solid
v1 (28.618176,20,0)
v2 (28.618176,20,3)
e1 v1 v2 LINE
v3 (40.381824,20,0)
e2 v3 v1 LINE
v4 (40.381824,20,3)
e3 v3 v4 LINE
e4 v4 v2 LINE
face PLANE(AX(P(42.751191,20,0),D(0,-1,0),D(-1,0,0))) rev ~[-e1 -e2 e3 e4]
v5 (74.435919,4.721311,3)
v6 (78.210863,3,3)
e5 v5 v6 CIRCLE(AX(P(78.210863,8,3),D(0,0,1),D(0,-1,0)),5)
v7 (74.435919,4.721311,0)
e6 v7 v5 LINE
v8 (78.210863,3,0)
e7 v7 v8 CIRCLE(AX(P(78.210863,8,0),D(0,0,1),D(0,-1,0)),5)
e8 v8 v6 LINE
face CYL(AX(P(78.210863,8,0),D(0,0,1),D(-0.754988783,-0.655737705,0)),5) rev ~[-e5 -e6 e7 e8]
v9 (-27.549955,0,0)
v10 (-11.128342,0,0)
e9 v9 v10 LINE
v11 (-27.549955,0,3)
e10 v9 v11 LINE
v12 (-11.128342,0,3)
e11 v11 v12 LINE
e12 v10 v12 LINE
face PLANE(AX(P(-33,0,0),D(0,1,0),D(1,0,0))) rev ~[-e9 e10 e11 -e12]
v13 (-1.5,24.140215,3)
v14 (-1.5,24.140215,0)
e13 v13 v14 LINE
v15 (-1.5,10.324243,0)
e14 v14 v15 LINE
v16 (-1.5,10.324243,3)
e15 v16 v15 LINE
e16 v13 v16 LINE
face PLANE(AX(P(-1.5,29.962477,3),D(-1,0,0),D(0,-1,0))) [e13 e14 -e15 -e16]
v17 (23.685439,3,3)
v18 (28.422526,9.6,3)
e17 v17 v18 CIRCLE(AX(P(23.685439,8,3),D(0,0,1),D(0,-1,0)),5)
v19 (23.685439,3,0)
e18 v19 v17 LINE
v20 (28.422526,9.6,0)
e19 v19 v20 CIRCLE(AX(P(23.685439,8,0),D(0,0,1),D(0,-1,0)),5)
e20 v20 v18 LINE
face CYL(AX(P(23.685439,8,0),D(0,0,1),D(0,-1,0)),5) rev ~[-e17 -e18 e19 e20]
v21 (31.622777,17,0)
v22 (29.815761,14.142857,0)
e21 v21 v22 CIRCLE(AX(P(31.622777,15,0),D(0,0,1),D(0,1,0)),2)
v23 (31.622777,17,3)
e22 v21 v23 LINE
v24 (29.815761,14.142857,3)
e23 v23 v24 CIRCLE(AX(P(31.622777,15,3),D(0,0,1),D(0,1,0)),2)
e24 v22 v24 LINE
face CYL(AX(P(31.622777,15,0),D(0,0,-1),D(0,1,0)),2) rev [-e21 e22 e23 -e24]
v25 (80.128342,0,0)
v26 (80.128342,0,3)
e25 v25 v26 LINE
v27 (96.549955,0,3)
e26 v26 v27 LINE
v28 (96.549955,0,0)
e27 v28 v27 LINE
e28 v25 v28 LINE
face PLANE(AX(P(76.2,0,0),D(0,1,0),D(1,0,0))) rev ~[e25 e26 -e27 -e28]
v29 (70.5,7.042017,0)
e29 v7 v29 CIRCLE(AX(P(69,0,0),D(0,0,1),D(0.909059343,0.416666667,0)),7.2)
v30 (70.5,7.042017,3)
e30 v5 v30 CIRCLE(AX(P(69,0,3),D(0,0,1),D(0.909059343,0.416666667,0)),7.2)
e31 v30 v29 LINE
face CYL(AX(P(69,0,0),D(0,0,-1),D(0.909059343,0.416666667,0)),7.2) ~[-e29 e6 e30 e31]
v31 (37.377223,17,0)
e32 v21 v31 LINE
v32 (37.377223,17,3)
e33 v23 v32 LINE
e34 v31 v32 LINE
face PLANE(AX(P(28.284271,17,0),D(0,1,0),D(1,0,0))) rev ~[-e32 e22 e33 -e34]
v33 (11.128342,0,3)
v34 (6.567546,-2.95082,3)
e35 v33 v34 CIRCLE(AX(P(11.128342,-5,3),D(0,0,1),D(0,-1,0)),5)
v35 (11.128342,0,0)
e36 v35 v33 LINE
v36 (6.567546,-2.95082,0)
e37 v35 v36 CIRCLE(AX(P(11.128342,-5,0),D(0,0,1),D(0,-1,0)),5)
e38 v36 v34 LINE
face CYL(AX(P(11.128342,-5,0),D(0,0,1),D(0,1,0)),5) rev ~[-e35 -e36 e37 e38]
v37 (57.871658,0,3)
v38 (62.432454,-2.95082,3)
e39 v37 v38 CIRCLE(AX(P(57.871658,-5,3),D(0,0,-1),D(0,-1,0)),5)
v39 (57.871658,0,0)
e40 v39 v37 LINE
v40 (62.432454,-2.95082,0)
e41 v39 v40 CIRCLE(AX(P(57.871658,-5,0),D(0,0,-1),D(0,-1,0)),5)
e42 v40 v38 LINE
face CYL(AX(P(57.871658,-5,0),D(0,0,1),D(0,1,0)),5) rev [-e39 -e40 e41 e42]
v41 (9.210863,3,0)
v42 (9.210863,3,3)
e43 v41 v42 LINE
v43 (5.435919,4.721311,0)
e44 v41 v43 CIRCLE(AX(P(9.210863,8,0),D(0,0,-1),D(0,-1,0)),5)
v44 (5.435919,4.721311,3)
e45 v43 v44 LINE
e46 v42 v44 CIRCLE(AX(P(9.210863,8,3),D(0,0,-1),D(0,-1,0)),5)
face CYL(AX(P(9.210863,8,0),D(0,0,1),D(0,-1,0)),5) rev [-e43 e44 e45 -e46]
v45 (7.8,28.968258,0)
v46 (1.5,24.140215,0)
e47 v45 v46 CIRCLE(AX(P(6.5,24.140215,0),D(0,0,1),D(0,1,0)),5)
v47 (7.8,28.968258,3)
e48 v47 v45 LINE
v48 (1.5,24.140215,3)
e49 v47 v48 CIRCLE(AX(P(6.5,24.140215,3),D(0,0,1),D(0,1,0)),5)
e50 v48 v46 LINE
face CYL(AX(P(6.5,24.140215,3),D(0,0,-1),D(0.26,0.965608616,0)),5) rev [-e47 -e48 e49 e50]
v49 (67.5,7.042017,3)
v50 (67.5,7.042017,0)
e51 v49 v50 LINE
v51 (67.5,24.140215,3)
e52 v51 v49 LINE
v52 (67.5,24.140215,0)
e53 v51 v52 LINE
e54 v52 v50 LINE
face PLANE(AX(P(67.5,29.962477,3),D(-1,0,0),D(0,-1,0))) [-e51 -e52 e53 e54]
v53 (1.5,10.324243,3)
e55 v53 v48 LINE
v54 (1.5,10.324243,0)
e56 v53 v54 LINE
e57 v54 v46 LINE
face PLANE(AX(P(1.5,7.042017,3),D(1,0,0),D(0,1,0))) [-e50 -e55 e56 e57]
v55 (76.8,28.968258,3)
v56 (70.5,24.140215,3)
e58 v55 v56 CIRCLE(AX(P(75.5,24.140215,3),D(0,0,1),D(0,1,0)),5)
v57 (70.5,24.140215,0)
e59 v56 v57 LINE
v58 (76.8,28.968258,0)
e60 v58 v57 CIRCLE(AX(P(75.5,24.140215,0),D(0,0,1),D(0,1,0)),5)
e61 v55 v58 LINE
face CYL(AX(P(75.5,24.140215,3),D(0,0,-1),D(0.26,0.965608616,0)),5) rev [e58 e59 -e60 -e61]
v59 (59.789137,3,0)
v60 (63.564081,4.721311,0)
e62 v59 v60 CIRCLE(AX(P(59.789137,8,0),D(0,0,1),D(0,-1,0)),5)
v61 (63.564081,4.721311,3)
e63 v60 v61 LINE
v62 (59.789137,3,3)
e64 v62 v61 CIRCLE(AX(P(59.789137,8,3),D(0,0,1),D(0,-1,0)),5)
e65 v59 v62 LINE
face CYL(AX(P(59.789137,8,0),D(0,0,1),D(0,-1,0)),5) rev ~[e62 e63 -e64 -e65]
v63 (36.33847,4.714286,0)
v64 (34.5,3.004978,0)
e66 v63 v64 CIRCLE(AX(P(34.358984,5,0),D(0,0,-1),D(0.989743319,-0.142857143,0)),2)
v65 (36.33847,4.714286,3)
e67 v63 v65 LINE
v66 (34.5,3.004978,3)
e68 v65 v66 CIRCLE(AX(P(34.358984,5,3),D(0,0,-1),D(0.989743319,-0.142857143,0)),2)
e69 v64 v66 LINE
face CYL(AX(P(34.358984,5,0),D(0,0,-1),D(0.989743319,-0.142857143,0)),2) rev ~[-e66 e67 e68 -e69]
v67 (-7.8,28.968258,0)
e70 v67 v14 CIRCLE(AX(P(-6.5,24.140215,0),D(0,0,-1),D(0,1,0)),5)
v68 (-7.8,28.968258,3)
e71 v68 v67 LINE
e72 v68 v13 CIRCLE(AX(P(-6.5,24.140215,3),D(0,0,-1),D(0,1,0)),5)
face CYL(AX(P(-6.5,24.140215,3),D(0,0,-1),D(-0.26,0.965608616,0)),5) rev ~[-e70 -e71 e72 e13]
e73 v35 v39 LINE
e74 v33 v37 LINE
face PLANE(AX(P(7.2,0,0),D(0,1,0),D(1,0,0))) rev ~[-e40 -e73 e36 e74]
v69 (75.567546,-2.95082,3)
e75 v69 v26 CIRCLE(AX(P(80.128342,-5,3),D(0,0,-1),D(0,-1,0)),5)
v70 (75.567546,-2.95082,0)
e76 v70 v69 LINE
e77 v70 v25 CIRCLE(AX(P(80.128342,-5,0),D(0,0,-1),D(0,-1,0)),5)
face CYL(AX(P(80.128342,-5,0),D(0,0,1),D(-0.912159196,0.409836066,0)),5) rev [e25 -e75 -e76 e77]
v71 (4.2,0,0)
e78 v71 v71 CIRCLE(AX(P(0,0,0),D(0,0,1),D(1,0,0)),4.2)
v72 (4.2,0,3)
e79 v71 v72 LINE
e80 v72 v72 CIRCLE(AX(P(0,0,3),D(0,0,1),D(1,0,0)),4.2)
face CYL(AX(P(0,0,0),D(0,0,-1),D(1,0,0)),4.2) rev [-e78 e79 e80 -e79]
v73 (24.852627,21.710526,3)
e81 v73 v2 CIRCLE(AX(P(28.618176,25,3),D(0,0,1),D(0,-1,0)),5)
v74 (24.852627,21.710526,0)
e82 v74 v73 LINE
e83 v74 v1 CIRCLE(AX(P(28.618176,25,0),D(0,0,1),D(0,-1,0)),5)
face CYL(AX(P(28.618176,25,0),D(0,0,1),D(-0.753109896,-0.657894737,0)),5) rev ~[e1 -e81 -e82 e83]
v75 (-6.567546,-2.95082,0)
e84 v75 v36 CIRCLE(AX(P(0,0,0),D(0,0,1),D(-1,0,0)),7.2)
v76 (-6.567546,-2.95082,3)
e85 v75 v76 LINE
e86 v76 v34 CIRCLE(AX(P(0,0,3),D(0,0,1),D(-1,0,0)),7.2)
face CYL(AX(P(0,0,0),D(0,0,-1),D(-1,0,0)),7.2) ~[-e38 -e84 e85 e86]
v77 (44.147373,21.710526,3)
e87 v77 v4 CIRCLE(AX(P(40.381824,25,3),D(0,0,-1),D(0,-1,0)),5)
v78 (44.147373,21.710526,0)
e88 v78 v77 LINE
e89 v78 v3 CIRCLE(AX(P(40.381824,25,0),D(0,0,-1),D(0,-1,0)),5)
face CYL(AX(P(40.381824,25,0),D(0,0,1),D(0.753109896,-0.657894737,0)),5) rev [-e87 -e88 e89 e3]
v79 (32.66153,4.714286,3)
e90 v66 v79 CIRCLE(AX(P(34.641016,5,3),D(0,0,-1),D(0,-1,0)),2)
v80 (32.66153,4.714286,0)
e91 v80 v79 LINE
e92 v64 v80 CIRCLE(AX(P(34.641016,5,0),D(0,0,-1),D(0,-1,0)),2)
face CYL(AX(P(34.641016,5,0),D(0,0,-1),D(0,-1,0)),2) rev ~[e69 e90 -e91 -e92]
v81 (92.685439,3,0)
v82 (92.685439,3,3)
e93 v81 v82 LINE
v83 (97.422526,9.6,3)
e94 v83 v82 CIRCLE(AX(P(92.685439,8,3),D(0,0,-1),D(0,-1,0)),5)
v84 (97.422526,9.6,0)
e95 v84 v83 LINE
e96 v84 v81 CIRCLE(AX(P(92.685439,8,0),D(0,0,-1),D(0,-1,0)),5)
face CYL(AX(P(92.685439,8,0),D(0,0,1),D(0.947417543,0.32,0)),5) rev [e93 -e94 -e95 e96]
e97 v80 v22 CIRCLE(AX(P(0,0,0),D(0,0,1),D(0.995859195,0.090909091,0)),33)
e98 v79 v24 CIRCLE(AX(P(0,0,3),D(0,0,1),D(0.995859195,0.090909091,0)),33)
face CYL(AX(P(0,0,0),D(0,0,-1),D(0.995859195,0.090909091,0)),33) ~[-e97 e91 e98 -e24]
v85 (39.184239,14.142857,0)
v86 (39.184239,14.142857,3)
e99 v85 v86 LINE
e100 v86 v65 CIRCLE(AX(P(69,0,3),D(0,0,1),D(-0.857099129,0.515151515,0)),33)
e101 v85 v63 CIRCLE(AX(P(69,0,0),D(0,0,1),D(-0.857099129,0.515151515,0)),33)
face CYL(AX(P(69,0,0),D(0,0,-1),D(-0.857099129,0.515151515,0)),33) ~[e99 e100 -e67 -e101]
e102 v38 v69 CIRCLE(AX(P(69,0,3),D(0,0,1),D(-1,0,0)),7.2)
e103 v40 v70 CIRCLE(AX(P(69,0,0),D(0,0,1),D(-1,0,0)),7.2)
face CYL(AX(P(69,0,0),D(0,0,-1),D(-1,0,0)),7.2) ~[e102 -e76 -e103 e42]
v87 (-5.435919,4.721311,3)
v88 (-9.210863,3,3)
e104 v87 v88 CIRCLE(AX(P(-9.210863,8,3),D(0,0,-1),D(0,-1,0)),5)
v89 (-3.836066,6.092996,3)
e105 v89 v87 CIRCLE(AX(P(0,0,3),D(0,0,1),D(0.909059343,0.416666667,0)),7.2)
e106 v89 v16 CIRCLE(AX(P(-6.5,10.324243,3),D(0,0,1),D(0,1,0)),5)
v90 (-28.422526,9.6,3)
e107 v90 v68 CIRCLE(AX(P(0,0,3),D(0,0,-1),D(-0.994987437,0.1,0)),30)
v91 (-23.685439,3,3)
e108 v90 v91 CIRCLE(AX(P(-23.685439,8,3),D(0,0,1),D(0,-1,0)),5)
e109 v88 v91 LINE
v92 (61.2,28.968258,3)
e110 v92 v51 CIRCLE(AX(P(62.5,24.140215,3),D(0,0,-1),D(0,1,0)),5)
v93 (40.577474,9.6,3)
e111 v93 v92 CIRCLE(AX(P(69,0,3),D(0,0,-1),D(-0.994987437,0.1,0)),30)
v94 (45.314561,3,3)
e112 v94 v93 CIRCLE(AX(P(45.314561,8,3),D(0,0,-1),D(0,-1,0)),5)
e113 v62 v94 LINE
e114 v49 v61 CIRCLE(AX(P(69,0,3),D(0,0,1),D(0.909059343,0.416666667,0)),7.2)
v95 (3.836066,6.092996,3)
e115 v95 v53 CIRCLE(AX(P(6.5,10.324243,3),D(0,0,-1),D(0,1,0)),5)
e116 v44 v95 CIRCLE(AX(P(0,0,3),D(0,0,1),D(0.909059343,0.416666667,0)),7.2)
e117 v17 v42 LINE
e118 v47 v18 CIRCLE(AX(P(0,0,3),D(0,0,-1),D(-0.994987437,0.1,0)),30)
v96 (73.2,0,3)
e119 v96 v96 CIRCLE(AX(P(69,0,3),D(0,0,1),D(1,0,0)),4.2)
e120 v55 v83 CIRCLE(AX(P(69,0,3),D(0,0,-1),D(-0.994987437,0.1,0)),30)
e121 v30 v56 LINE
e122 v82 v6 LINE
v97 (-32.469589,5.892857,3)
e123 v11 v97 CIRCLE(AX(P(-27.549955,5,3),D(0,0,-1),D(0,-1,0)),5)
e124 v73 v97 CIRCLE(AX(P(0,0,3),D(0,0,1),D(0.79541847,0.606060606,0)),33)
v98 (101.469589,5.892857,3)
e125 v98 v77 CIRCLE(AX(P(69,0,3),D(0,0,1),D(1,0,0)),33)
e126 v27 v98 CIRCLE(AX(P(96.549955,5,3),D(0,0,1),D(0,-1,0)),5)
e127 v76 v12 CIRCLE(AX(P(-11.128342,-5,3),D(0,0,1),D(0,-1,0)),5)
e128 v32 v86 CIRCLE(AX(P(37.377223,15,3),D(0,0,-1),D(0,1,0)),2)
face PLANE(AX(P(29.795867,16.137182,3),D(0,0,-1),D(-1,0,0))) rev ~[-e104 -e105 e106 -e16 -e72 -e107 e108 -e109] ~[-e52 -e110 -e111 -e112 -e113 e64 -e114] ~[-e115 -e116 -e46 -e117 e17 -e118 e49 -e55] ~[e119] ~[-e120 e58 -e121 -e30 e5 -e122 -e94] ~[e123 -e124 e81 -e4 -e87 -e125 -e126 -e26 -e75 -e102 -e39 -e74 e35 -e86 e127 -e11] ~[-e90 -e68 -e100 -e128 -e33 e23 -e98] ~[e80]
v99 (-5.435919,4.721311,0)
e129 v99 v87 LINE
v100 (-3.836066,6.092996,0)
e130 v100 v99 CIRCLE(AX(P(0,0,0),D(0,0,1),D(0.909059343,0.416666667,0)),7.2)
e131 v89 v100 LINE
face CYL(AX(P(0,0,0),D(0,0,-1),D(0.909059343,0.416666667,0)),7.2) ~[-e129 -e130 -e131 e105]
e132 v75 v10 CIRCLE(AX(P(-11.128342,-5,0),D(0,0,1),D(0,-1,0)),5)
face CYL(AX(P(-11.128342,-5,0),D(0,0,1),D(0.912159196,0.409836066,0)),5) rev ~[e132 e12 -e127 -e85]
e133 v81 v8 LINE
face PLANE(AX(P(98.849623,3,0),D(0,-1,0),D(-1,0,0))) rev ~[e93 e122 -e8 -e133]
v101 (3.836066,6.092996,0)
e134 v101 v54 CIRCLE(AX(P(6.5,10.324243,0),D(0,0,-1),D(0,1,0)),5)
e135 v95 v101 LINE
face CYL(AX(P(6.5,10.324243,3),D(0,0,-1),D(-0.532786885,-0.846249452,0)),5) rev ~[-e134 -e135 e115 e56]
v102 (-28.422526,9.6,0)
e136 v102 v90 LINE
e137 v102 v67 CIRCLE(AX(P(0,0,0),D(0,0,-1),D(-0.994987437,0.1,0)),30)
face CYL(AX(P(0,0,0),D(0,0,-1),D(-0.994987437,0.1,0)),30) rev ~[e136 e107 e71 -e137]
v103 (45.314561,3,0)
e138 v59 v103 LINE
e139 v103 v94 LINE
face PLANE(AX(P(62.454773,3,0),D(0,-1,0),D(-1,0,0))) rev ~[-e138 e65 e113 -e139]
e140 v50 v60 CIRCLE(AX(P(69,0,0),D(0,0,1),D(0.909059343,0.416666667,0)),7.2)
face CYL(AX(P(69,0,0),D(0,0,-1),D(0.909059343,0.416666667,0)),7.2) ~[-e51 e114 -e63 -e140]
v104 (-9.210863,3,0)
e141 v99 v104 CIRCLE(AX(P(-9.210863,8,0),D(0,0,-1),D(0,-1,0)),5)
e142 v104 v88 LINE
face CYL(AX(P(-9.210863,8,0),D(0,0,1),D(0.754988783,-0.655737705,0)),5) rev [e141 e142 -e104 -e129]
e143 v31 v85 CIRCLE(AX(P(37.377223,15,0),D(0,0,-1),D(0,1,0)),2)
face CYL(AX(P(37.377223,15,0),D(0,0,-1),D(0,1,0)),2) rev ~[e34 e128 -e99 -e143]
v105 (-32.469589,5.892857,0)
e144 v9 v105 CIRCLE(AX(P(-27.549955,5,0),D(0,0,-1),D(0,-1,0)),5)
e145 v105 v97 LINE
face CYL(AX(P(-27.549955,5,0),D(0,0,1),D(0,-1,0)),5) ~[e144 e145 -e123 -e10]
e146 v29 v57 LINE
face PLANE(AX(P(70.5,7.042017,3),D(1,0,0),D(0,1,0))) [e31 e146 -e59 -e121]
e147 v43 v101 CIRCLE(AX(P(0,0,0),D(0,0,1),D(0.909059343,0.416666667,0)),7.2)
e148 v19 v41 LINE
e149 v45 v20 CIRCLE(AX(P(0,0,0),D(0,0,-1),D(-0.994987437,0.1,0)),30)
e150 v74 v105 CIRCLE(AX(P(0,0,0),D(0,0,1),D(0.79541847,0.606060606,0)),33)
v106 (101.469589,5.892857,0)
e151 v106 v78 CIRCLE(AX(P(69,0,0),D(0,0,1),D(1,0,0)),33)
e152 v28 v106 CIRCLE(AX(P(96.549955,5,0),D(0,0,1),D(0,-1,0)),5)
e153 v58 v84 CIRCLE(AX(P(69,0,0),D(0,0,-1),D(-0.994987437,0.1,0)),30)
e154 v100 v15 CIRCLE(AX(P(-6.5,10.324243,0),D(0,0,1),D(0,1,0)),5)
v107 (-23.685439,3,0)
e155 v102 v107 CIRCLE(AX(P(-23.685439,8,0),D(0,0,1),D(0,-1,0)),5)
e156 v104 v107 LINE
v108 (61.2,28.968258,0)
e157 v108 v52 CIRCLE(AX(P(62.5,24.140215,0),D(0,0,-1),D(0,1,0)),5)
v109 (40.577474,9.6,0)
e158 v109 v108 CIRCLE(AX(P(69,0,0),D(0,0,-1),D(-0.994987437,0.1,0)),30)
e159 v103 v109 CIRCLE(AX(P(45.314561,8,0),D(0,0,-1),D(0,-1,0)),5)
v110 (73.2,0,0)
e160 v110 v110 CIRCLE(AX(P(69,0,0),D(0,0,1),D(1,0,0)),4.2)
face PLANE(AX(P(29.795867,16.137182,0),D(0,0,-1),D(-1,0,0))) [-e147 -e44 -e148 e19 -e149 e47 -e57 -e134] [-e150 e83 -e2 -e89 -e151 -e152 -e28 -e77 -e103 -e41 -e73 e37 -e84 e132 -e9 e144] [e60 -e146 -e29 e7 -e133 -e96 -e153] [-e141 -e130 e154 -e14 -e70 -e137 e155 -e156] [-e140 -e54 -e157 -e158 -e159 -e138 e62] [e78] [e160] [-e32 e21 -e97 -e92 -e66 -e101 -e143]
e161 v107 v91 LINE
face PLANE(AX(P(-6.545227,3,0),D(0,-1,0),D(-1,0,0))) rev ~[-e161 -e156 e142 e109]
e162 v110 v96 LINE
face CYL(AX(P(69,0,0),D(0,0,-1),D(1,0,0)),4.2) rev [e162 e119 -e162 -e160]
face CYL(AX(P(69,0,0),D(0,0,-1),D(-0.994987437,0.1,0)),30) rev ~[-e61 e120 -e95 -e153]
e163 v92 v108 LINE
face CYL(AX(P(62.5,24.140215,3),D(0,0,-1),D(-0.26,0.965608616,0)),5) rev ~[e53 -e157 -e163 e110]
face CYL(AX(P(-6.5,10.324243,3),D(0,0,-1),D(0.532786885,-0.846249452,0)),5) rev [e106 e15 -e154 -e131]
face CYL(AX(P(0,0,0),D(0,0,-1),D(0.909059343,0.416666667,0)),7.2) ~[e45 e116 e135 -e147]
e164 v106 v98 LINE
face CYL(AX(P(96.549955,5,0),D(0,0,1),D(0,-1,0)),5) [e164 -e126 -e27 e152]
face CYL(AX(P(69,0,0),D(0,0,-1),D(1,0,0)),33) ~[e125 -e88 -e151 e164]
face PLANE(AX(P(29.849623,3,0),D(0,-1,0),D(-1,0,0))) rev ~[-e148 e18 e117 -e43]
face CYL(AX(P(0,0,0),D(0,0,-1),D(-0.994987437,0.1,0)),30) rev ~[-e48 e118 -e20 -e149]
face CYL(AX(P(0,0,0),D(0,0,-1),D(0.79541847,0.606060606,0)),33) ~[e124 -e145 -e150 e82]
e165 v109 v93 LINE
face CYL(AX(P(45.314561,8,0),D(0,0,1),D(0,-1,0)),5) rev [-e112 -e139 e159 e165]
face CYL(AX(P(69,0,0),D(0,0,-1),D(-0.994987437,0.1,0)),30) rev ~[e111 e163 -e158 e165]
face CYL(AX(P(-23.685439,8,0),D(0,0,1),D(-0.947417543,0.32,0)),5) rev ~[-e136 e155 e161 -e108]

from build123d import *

# Parameters (mm, degrees)
F0_R        = 4.2
F1_DEPTH    = 3
F3_DEPTH    = 3
F4_R        = 5
F5_T1_DEPTH = 3


# Not quite as in the source:
# - a fillet or chamfer that OpenCascade refuses, or shapes differently, is made with other operations: its cross-section is extruded or revolved along the edge and cut away or added


with BuildPart() as f1:
    # F0 (on Top) → F1 (new body)
    with BuildSketch(Plane.XY):
        with BuildLine():
            ThreePointArc((6.5452272688, 3), (7.0344024741, 1.5353116402), (7.2, 0))
            Line((7.2, 0), (33, 0))
            Line((33, 0), (36, 0))
            Line((36, 0), (61.8, 0))
            ThreePointArc((61.8, 0), (61.9655975259, 1.5353116402), (62.4547727312, 3))
            Line((62.4547727312, 3), (39.1503768868, 3))
            ThreePointArc((39.1503768868, 3), (69, 30), (98.8496231132, 3))
            Line((98.8496231132, 3), (75.5452272688, 3))
            ThreePointArc((75.5452272688, 3), (76.0344024741, 1.5353116402), (76.2, 0))
            Line((76.2, 0), (102, 0))
            ThreePointArc((102, 0), (79.5543660777, 31.2666812549), (42.7511905032, 20))
            Line((42.7511905032, 20), (26.2488094968, 20))
            ThreePointArc((26.2488094968, 20), (-10.5543660777, 31.2666812549), (-33, 0))
            Line((-33, 0), (-7.2, 0))
            ThreePointArc((-7.2, 0), (-7.0344024741, 1.5353116402), (-6.5452272688, 3))
            Line((-6.5452272688, 3), (-29.8496231132, 3))
            ThreePointArc((-29.8496231132, 3), (0, 30), (29.8496231132, 3))
            Line((29.8496231132, 3), (6.5452272688, 3))
        make_face()
        with BuildLine():
            Line((36.1366465497, 3), (32.8633534503, 3))
            ThreePointArc((32.8633534503, 3), (31.364916731, 10.2587522855), (28.2842712475, 17))
            Line((28.2842712475, 17), (40.7157287525, 17))
            ThreePointArc((40.7157287525, 17), (37.635083269, 10.2587522855), (36.1366465497, 3))
        make_face(mode=Mode.SUBTRACT)
        with BuildLine():
            ThreePointArc((-7.2, 0), (0, -7.2), (7.2, 0))
            ThreePointArc((7.2, 0), (7.0344024741, 1.5353116402), (6.5452272688, 3))
            ThreePointArc((6.5452272688, 3), (0, 7.2), (-6.5452272688, 3))
            ThreePointArc((-6.5452272688, 3), (-7.0344024741, 1.5353116402), (-7.2, 0))
        make_face()
        Circle(F0_R, mode=Mode.SUBTRACT)
        with BuildLine():
            ThreePointArc((62.4547727312, 3), (61.9655975259, 1.5353116402), (61.8, 0))
            ThreePointArc((61.8, 0), (69, -7.2), (76.2, 0))
            ThreePointArc((76.2, 0), (76.0344024741, 1.5353116402), (75.5452272688, 3))
            ThreePointArc((75.5452272688, 3), (69, 7.2), (62.4547727312, 3))
        make_face()
        with Locations((69, 0)):
            Circle(F0_R, mode=Mode.SUBTRACT)
    extrude(amount=F1_DEPTH)

    # F2 (on face) → F3 (join, through all)
    with BuildSketch(Plane.XY.offset(3)):
        with BuildLine():
            Line((1.5, 7.0420167566), (1.5, 29.9624765332))
            ThreePointArc((1.5, 29.9624765332), (0.7502346317, 29.9906176662), (0, 30))
            Line((0, 30), (0, 7.2))
            ThreePointArc((0, 7.2), (0.7541483119, 7.1603952631), (1.5, 7.0420167566))
        make_face()
        with BuildLine():
            Line((0, 7.2), (0, 30))
            ThreePointArc((0, 30), (-0.7502346317, 29.9906176662), (-1.5, 29.9624765332))
            Line((-1.5, 29.9624765332), (-1.5, 7.0420167566))
            ThreePointArc((-1.5, 7.0420167566), (-0.7541483119, 7.1603952631), (0, 7.2))
        make_face()
        with BuildLine():
            Line((69, 7.2), (69, 30))
            ThreePointArc((69, 30), (68.2497653683, 29.9906176662), (67.5, 29.9624765332))
            Line((67.5, 29.9624765332), (67.5, 7.0420167566))
            ThreePointArc((67.5, 7.0420167566), (68.2458516881, 7.1603952631), (69, 7.2))
        make_face()
        with BuildLine():
            Line((70.5, 7.0420167566), (70.5, 29.9624765332))
            ThreePointArc((70.5, 29.9624765332), (69.7502346317, 29.9906176662), (69, 30))
            Line((69, 30), (69, 7.2))
            ThreePointArc((69, 7.2), (69.7541483119, 7.1603952631), (70.5, 7.0420167566))
        make_face()
    extrude(amount=-F3_DEPTH)

    # F4
    f4_edges = [f1.edges().sort_by_distance(p)[0] for p in [
        (-29.849623, 3, 1.5),
        (29.849623, 3, 1.5),
        (98.849623, 3, 1.5),
        (39.150377, 3, 1.5),
        (-7.2, 0, 1.5),
        (7.2, 0, 1.5),
        (61.8, 0, 1.5),
        (76.2, 0, 1.5),
        (75.545227, 3, 1.5),
        (62.454773, 3, 1.5),
        (-6.545227, 3, 1.5),
        (6.545227, 3, 1.5),
        (26.248809, 20, 1.5),
        (42.751191, 20, 1.5),
        (102, 0, 1.5),
        (-33, 0, 1.5),
        (-1.5, 7.042017, 1.5),
        (1.5, 7.042017, 1.5),
        (1.5, 29.962477, 1.5),
        (-1.5, 29.962477, 1.5),
        (70.5, 29.962477, 1.5),
        (67.5, 29.962477, 1.5),
    ]]
    fillet(f4_edges, radius=F4_R)

    # F5: fillet of radius 2 on 4 edges, made by hand

    # F5_s2 → F5_t1 (join)
    with BuildSketch(Plane.XY):
        with BuildLine():
            ThreePointArc((31.6227766017, 17), (29.9324680922, 16.0690449676), (29.8157607959, 14.1428571429))
            ThreePointArc((29.8157607959, 14.1428571429), (29.0851207181, 15.5902454379), (28.2842712475, 17))
            Line((28.2842712475, 17), (31.6227766017, 17))
        make_face()
        with BuildLine():
            ThreePointArc((37.3772233983, 17), (39.0675319078, 16.0690449676), (39.1842392041, 14.1428571429))
            ThreePointArc((39.1842392041, 14.1428571429), (39.9148792819, 15.5902454379), (40.7157287525, 17))
            Line((40.7157287525, 17), (37.3772233983, 17))
        make_face()
        with BuildLine():
            ThreePointArc((34.6410161514, 3), (33.33170881, 3.488142108), (32.6615295142, 4.7142857143))
            ThreePointArc((32.6615295142, 4.7142857143), (32.7736520051, 3.8584626791), (32.8633534503, 3))
            Line((32.8633534503, 3), (34.6410161514, 3))
        make_face()
        with BuildLine():
            ThreePointArc((36.3384704858, 4.7142857143), (35.66829119, 3.488142108), (34.3589838486, 3))
            Line((34.3589838486, 3), (36.1366465497, 3))
            ThreePointArc((36.1366465497, 3), (36.2263479949, 3.8584626791), (36.3384704858, 4.7142857143))
        make_face()
    extrude(amount=F5_T1_DEPTH)


solid = f1.part
